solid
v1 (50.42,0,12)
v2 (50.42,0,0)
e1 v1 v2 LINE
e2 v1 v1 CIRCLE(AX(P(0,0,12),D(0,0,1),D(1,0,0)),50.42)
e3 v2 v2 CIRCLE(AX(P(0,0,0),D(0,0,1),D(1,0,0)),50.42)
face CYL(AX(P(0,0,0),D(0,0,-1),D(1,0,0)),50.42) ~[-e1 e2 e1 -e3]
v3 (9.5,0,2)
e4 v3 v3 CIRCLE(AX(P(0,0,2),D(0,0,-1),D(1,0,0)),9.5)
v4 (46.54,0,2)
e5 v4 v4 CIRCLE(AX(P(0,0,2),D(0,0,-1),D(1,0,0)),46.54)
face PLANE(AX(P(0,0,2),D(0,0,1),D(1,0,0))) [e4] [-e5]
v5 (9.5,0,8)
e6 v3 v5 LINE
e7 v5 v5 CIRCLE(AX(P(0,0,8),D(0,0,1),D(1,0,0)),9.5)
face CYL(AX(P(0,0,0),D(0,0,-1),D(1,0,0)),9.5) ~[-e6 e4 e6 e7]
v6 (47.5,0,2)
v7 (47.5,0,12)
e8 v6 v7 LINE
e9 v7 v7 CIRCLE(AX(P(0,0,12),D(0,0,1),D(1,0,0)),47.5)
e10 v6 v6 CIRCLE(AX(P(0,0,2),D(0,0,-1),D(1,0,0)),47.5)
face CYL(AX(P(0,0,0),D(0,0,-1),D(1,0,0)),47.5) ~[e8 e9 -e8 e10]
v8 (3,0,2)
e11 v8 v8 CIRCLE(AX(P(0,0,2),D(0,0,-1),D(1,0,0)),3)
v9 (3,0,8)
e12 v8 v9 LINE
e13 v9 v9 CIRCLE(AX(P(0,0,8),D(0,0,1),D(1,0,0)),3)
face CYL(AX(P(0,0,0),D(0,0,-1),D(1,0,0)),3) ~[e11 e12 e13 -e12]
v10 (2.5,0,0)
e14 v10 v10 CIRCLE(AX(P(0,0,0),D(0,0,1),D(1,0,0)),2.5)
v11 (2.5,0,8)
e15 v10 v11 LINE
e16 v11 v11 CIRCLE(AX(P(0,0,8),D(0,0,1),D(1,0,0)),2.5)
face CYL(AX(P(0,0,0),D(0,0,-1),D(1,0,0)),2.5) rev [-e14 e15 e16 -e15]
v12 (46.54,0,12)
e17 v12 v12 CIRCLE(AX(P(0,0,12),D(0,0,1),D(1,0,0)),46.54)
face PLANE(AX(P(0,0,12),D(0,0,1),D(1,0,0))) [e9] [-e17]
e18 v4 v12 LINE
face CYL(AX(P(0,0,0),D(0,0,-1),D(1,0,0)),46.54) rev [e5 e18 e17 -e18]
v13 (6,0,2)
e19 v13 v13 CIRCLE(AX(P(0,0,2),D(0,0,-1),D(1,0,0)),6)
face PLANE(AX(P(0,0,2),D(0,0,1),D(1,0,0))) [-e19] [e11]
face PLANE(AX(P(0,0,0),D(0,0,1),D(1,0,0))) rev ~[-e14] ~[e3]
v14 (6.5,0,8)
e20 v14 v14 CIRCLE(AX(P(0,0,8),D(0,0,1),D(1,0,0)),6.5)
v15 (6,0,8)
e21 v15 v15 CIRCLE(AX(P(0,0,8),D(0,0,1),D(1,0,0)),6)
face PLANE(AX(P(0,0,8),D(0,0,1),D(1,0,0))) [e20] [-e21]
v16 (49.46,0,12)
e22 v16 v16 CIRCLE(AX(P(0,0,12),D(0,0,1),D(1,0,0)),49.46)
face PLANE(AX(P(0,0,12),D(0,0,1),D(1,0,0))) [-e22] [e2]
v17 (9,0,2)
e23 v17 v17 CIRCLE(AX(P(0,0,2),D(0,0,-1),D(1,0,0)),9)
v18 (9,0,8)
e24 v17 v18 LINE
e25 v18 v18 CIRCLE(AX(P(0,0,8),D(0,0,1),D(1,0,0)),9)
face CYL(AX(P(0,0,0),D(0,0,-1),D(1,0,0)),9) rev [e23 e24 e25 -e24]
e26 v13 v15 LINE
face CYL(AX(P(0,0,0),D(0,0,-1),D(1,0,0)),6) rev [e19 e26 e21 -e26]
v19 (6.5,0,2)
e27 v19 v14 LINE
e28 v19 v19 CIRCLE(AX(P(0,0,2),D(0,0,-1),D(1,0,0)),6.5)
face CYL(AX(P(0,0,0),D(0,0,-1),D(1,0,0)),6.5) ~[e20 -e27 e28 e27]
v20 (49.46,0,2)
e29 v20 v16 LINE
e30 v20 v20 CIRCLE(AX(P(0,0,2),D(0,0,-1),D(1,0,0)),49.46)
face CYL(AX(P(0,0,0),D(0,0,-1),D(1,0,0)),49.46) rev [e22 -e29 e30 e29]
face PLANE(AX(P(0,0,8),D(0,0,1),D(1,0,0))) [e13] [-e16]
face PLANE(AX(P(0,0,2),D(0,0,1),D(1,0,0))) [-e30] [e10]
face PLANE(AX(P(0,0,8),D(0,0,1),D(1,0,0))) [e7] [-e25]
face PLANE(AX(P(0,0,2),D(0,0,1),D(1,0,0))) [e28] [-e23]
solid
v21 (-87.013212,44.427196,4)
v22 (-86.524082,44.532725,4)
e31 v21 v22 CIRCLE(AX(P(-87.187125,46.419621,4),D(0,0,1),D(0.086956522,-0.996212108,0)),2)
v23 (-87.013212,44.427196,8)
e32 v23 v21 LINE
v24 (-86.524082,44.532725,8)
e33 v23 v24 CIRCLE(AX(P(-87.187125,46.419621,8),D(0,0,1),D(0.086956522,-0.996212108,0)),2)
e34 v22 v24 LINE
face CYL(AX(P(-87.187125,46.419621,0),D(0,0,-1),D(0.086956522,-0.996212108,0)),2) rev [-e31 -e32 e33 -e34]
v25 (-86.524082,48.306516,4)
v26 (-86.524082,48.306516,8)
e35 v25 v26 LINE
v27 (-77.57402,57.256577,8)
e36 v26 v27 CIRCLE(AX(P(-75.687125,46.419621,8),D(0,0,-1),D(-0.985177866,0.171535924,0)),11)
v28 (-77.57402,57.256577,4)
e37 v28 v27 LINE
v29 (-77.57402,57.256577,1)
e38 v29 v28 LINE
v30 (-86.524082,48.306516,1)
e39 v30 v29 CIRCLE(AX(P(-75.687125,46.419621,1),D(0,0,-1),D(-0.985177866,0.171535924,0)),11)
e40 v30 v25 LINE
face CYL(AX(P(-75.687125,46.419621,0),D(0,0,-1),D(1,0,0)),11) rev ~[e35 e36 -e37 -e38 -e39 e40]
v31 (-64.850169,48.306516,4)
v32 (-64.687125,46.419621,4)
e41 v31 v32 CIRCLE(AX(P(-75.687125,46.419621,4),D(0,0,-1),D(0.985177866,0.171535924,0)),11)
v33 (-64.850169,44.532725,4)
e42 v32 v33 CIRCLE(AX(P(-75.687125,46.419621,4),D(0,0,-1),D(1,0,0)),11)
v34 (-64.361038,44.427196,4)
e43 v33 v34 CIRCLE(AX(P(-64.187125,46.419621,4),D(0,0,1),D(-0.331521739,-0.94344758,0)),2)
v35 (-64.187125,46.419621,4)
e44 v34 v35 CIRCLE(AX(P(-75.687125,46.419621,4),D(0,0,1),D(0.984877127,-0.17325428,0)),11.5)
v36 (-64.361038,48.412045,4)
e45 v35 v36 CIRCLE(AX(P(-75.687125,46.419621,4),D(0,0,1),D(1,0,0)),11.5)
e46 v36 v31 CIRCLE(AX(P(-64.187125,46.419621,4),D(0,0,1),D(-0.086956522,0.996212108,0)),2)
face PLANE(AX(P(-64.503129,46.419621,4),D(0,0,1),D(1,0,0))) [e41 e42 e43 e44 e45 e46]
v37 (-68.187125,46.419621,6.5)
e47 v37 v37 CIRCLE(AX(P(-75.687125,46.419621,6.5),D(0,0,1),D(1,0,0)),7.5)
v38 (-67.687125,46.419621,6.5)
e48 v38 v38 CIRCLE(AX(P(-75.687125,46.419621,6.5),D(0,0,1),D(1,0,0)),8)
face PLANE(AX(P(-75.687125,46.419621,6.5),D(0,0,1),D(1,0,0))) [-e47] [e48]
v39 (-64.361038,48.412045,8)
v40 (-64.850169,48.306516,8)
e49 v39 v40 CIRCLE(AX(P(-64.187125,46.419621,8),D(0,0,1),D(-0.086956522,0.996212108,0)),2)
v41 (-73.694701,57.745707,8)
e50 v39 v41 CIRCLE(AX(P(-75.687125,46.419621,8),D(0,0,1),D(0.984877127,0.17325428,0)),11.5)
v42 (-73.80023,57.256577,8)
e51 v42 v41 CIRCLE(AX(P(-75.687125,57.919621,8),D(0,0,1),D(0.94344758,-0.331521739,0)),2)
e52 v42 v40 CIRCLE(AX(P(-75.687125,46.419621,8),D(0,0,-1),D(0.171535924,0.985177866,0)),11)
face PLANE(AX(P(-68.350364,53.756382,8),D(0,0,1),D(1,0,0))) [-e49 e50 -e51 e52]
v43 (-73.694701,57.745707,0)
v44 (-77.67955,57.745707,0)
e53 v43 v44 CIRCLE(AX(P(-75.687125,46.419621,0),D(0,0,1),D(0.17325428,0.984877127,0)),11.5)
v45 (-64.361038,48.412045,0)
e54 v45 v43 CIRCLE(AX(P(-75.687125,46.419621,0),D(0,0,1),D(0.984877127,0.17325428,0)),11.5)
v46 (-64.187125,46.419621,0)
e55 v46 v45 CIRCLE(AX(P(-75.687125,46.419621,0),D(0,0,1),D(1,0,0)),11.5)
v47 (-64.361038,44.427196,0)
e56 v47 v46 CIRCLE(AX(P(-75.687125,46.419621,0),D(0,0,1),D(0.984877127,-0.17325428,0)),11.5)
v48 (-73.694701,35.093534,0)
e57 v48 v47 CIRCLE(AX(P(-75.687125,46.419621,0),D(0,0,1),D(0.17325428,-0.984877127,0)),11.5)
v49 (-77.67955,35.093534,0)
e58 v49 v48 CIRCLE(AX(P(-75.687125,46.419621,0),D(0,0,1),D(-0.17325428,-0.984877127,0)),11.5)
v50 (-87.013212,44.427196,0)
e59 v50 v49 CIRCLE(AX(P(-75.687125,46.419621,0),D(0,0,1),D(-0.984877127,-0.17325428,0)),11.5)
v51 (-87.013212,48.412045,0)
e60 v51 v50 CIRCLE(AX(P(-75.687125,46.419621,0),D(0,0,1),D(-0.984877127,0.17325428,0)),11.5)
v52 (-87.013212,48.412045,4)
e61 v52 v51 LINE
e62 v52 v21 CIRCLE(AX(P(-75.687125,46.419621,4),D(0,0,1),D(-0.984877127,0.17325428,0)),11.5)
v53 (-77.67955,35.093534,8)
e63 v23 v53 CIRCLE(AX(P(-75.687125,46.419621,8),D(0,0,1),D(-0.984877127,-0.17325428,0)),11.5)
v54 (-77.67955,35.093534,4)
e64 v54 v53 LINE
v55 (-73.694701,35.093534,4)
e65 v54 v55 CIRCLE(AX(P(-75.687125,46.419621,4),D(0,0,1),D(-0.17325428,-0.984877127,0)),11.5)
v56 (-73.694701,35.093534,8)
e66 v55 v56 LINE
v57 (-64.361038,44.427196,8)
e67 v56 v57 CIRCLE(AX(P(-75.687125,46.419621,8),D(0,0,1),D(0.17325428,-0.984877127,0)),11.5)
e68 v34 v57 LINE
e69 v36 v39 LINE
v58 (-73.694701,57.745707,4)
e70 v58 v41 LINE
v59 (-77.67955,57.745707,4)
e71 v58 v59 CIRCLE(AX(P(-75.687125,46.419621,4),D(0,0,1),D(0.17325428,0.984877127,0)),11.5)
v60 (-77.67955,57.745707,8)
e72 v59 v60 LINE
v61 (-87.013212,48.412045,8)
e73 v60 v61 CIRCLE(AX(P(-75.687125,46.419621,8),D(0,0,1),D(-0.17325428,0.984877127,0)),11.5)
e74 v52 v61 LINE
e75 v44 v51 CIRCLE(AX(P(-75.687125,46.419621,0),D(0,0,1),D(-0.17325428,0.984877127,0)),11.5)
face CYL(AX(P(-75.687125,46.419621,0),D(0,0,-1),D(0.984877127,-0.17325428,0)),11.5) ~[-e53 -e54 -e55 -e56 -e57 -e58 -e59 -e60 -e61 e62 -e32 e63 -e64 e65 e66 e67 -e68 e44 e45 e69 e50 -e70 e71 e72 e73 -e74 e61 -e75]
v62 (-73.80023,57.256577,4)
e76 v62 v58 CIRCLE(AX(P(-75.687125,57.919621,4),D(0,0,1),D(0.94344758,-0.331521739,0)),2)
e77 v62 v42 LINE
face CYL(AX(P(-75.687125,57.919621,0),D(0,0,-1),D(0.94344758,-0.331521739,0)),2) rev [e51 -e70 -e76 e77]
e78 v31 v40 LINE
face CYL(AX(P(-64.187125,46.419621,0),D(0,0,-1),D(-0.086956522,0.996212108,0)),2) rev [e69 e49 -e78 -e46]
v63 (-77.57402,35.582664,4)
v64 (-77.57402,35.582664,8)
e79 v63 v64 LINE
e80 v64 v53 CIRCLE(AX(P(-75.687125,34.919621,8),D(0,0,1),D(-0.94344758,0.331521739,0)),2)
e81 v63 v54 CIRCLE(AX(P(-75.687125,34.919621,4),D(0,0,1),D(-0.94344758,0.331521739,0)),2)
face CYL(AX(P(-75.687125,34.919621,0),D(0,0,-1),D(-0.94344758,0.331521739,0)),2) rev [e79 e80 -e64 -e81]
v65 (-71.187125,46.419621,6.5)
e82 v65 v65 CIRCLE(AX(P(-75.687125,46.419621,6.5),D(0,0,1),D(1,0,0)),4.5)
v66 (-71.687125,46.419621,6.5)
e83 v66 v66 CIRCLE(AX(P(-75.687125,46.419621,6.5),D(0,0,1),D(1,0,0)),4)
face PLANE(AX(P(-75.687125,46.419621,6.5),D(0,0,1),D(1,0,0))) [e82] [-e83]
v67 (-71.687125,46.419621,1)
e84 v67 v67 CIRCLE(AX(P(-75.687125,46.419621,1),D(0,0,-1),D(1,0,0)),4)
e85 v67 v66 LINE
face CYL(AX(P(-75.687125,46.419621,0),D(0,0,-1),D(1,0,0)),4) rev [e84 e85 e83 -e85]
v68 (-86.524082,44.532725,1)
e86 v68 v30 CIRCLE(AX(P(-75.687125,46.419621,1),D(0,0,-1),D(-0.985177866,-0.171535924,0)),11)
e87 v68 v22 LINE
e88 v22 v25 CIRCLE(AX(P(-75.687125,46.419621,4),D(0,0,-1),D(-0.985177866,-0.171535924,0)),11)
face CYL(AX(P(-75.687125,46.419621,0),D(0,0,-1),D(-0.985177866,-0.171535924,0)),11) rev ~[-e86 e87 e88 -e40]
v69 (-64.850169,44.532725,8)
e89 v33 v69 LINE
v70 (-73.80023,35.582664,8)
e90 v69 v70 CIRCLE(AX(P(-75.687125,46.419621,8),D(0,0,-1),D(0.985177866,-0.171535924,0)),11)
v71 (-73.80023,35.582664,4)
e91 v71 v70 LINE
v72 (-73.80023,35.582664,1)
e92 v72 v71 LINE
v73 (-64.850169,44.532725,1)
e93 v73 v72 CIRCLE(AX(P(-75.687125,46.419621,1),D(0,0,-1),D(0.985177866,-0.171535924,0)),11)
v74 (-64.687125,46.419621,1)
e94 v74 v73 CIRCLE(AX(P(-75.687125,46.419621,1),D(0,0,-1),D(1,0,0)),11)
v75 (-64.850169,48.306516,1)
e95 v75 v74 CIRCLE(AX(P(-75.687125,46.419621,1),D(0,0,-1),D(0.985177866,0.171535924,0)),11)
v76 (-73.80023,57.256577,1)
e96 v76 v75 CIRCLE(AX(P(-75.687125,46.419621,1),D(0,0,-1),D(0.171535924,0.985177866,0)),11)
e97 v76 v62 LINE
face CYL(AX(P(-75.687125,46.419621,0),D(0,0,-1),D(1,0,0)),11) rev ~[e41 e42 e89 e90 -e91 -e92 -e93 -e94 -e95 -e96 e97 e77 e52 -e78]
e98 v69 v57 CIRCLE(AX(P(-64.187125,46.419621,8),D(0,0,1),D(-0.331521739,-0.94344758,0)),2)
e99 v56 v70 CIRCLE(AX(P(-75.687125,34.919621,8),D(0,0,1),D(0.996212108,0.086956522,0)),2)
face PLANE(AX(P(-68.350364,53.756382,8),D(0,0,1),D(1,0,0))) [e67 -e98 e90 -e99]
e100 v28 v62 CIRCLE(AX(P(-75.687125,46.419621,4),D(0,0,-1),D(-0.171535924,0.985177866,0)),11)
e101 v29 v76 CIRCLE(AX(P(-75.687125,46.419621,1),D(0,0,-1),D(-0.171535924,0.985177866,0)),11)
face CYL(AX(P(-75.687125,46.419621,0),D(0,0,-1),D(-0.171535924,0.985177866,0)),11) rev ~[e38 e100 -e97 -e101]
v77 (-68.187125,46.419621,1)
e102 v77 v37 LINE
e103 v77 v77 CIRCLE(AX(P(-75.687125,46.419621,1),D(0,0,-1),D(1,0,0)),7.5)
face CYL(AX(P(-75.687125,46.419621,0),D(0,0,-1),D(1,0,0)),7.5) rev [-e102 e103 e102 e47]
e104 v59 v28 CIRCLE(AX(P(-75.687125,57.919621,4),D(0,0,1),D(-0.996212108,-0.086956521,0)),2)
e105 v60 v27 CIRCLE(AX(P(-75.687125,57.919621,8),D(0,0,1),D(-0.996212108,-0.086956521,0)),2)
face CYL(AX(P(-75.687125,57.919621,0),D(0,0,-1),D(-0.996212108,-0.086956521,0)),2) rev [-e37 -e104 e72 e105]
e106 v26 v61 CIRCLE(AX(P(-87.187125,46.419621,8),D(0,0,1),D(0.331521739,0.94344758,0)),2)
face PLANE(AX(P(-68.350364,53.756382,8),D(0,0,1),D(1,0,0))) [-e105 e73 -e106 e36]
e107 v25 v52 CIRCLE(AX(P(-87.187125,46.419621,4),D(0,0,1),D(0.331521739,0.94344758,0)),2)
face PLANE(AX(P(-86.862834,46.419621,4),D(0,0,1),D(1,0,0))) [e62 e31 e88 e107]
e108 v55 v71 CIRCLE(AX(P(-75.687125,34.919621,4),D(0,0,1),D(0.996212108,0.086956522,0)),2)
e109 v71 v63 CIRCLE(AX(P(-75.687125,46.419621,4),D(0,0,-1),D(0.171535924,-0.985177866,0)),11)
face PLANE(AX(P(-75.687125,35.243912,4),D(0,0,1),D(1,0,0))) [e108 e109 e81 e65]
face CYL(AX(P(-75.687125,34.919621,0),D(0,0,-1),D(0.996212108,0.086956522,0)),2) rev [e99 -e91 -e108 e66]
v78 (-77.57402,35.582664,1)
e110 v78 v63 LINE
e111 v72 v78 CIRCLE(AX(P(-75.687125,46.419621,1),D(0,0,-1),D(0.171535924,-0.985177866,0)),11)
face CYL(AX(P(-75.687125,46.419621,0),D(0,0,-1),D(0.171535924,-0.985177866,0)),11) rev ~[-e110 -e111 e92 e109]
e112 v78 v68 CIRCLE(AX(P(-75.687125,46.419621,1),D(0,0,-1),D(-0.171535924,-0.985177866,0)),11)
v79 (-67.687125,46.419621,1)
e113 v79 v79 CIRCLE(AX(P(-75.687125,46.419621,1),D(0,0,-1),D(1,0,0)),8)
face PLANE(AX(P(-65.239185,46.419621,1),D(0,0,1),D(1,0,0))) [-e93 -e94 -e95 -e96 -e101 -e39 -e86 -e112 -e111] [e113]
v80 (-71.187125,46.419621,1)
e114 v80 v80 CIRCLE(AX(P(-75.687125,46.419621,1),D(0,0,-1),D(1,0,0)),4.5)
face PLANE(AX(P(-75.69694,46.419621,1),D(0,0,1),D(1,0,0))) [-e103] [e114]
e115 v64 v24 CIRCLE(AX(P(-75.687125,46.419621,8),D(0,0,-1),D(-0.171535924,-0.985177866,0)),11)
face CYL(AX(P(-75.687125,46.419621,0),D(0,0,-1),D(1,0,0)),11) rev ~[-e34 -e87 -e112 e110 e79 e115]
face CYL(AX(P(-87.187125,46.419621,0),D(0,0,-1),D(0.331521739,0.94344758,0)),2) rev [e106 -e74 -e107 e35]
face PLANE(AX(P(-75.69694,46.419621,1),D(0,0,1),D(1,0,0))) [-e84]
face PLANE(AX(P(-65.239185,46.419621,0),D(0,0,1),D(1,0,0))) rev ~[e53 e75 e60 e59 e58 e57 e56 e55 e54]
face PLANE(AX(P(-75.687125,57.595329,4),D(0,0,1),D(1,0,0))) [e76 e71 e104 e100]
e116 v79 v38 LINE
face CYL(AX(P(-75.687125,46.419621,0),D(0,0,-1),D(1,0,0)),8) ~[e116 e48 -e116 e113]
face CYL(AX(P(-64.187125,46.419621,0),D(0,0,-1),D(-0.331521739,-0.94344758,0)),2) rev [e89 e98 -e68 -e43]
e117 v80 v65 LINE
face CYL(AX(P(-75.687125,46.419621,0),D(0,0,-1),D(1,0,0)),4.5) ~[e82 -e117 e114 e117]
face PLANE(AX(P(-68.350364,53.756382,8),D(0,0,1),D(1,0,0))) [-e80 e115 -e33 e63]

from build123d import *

# Parameters (mm, degrees)
F0_R      = 50.42
F0_R_2    = 49.46
F0_R_3    = 47.5
F0_R_4    = 46.54
F0_R_5    = 9.5
F0_R_6    = 9
F0_R_7    = 6.5
F0_R_8    = 6
F0_R_9    = 3
F0_R_10   = 2.5
F1_DEPTH  = 2
F2_DEPTH  = 12
F3_DEPTH  = 8
F4_R      = 8
F4_R_2    = 7.5
F4_R_3    = 4.5
F4_R_4    = 4
F5_DEPTH  = 1
F6_DEPTH  = 8
F7_DEPTH  = 8
F8_DEPTH  = 1.5
F9_DEPTH  = 1
F10_DEPTH = 4


with BuildPart() as f1:
    # F0 (on Top) → F1 (new body)
    with BuildSketch(Plane.XY):
        Circle(F0_R)
        Circle(F0_R_2, mode=Mode.SUBTRACT)
        Circle(F0_R_2)
        Circle(F0_R_3, mode=Mode.SUBTRACT)
        Circle(F0_R_3)
        Circle(F0_R_4, mode=Mode.SUBTRACT)
        Circle(F0_R_4)
        Circle(F0_R_5, mode=Mode.SUBTRACT)
        Circle(F0_R_5)
        Circle(F0_R_6, mode=Mode.SUBTRACT)
        Circle(F0_R_6)
        Circle(F0_R_7, mode=Mode.SUBTRACT)
        Circle(F0_R_7)
        Circle(F0_R_8, mode=Mode.SUBTRACT)
        Circle(F0_R_8)
        Circle(F0_R_9, mode=Mode.SUBTRACT)
        Circle(F0_R_9)
        Circle(F0_R_10, mode=Mode.SUBTRACT)
    extrude(amount=F1_DEPTH)

    # F0 (on Top) → F2 (join)
    with BuildSketch(Plane.XY):
        Circle(F0_R)
        Circle(F0_R_2, mode=Mode.SUBTRACT)
        Circle(F0_R_3)
        Circle(F0_R_4, mode=Mode.SUBTRACT)
    extrude(amount=F2_DEPTH)

    # F0 (on Top) → F3 (join)
    with BuildSketch(Plane.XY):
        Circle(F0_R_5)
        Circle(F0_R_6, mode=Mode.SUBTRACT)
        Circle(F0_R_7)
        Circle(F0_R_8, mode=Mode.SUBTRACT)
        Circle(F0_R_9)
        Circle(F0_R_10, mode=Mode.SUBTRACT)
    extrude(amount=F3_DEPTH)


with BuildPart() as f5:
    # F4 (on Top) → F5 (new body)
    with BuildSketch(Plane.XY):
        with BuildLine():
            ThreePointArc((-64.8501688035, 44.5327253536), (-66.1871253252, 46.4196205139), (-64.8501688035, 48.3065156742))
            ThreePointArc((-64.8501688035, 48.3065156742), (-67.9089507322, 54.197795107), (-73.8002301649, 57.2565770357))
            ThreePointArc((-73.8002301649, 57.2565770357), (-75.6871253252, 55.9196205139), (-77.5740204855, 57.2565770357))
            ThreePointArc((-77.5740204855, 57.2565770357), (-83.4652999183, 54.197795107), (-86.5240818469, 48.3065156742))
            ThreePointArc((-86.5240818469, 48.3065156742), (-85.5552419108, 47.5758888745), (-85.1871253252, 46.4196205139))
            ThreePointArc((-85.1871253252, 46.4196205139), (-85.5552419108, 45.2633521533), (-86.5240818469, 44.5327253536))
            ThreePointArc((-86.5240818469, 44.5327253536), (-83.4652999183, 38.6414459209), (-77.5740204855, 35.5826639922))
            ThreePointArc((-77.5740204855, 35.5826639922), (-75.6871253252, 36.9196205139), (-73.8002301649, 35.5826639922))
            ThreePointArc((-73.8002301649, 35.5826639922), (-67.9089507322, 38.6414459209), (-64.8501688035, 44.5327253536))
        make_face()
        with Locations((-75.6871253252, 46.4196205139)):
            Circle(F4_R, mode=Mode.SUBTRACT)
        with Locations((-75.6871253252, 46.4196205139)):
            Circle(F4_R)
        with Locations((-75.6871253252, 46.4196205139)):
            Circle(F4_R_2, mode=Mode.SUBTRACT)
        with Locations((-75.6871253252, 46.4196205139)):
            Circle(F4_R_2)
        with Locations((-75.6871253252, 46.4196205139)):
            Circle(F4_R_3, mode=Mode.SUBTRACT)
        with Locations((-75.6871253252, 46.4196205139)):
            Circle(F4_R_3)
        with Locations((-75.6871253252, 46.4196205139)):
            Circle(F4_R_4, mode=Mode.SUBTRACT)
        with Locations((-75.6871253252, 46.4196205139)):
            Circle(F4_R_4)
        with BuildLine():
            ThreePointArc((-73.8002301649, 57.2565770357), (-67.9089507322, 54.197795107), (-64.8501688035, 48.3065156742))
            ThreePointArc((-64.8501688035, 48.3065156742), (-64.6089169209, 48.374637611), (-64.3610383687, 48.4120447291))
            ThreePointArc((-64.3610383687, 48.4120447291), (-67.5553973416, 54.5513484976), (-73.69470111, 57.7457074704))
            ThreePointArc((-73.69470111, 57.7457074704), (-73.7321082281, 57.4978289182), (-73.8002301649, 57.2565770357))
        make_face()
        with BuildLine():
            ThreePointArc((-86.5240818469, 48.3065156742), (-83.4652999183, 54.197795107), (-77.5740204855, 57.2565770357))
            ThreePointArc((-77.5740204855, 57.2565770357), (-77.6421424223, 57.4978289182), (-77.6795495404, 57.7457074704))
            ThreePointArc((-77.6795495404, 57.7457074704), (-83.8188533088, 54.5513484976), (-87.0132122817, 48.4120447291))
            ThreePointArc((-87.0132122817, 48.4120447291), (-86.7653337295, 48.374637611), (-86.5240818469, 48.3065156742))
        make_face()
        with BuildLine():
            ThreePointArc((-77.6795495404, 35.0935335574), (-77.6421424223, 35.3414121096), (-77.5740204855, 35.5826639922))
            ThreePointArc((-77.5740204855, 35.5826639922), (-83.4652999183, 38.6414459209), (-86.5240818469, 44.5327253536))
            ThreePointArc((-86.5240818469, 44.5327253536), (-86.7653337295, 44.4646034168), (-87.0132122817, 44.4271962987))
            ThreePointArc((-87.0132122817, 44.4271962987), (-83.8188533088, 38.2878925303), (-77.6795495404, 35.0935335574))
        make_face()
        with BuildLine():
            ThreePointArc((-64.3610383687, 44.4271962987), (-64.6089169209, 44.4646034168), (-64.8501688035, 44.5327253536))
            ThreePointArc((-64.8501688035, 44.5327253536), (-67.9089507322, 38.6414459209), (-73.8002301649, 35.5826639922))
            ThreePointArc((-73.8002301649, 35.5826639922), (-73.7321082281, 35.3414121096), (-73.69470111, 35.0935335574))
            ThreePointArc((-73.69470111, 35.0935335574), (-67.5553973416, 38.2878925303), (-64.3610383687, 44.4271962987))
        make_face()
        with BuildLine():
            ThreePointArc((-77.5740204855, 57.2565770357), (-75.6871253252, 57.4196205139), (-73.8002301649, 57.2565770357))
            ThreePointArc((-73.8002301649, 57.2565770357), (-73.7321082281, 57.4978289182), (-73.69470111, 57.7457074704))
            ThreePointArc((-73.69470111, 57.7457074704), (-75.6871253252, 57.9196205139), (-77.6795495404, 57.7457074704))
            ThreePointArc((-77.6795495404, 57.7457074704), (-77.6421424223, 57.4978289182), (-77.5740204855, 57.2565770357))
        make_face()
        with BuildLine():
            ThreePointArc((-86.5240818469, 44.5327253536), (-86.6871253252, 46.4196205139), (-86.5240818469, 48.3065156742))
            ThreePointArc((-86.5240818469, 48.3065156742), (-86.7653337295, 48.374637611), (-87.0132122817, 48.4120447291))
            ThreePointArc((-87.0132122817, 48.4120447291), (-87.1871253252, 46.4196205139), (-87.0132122817, 44.4271962987))
            ThreePointArc((-87.0132122817, 44.4271962987), (-86.7653337295, 44.4646034168), (-86.5240818469, 44.5327253536))
        make_face()
        with BuildLine():
            ThreePointArc((-73.69470111, 35.0935335574), (-73.7321082281, 35.3414121096), (-73.8002301649, 35.5826639922))
            ThreePointArc((-73.8002301649, 35.5826639922), (-75.6871253252, 35.4196205139), (-77.5740204855, 35.5826639922))
            ThreePointArc((-77.5740204855, 35.5826639922), (-77.6421424223, 35.3414121096), (-77.6795495404, 35.0935335574))
            ThreePointArc((-77.6795495404, 35.0935335574), (-75.6871253252, 34.9196205139), (-73.69470111, 35.0935335574))
        make_face()
        with BuildLine():
            ThreePointArc((-64.8501688035, 48.3065156742), (-64.7279619963, 47.3665836232), (-64.6871253252, 46.4196205139))
            ThreePointArc((-64.6871253252, 46.4196205139), (-64.7279619963, 45.4726574046), (-64.8501688035, 44.5327253536))
            ThreePointArc((-64.8501688035, 44.5327253536), (-64.6089169209, 44.4646034168), (-64.3610383687, 44.4271962987))
            ThreePointArc((-64.3610383687, 44.4271962987), (-64.2306860878, 45.4196205139), (-64.1871253252, 46.4196205139))
            ThreePointArc((-64.1871253252, 46.4196205139), (-64.2306860878, 47.4196205139), (-64.3610383687, 48.4120447291))
            ThreePointArc((-64.3610383687, 48.4120447291), (-64.6089169209, 48.374637611), (-64.8501688035, 48.3065156742))
        make_face()
    extrude(amount=F5_DEPTH)

    # F4 (on Top) → F6 (join)
    with BuildSketch(Plane.XY):
        with BuildLine():
            ThreePointArc((-73.8002301649, 57.2565770357), (-67.9089507322, 54.197795107), (-64.8501688035, 48.3065156742))
            ThreePointArc((-64.8501688035, 48.3065156742), (-64.6089169209, 48.374637611), (-64.3610383687, 48.4120447291))
            ThreePointArc((-64.3610383687, 48.4120447291), (-67.5553973416, 54.5513484976), (-73.69470111, 57.7457074704))
            ThreePointArc((-73.69470111, 57.7457074704), (-73.7321082281, 57.4978289182), (-73.8002301649, 57.2565770357))
        make_face()
        with BuildLine():
            ThreePointArc((-77.5740204855, 57.2565770357), (-75.6871253252, 57.4196205139), (-73.8002301649, 57.2565770357))
            ThreePointArc((-73.8002301649, 57.2565770357), (-73.7321082281, 57.4978289182), (-73.69470111, 57.7457074704))
            ThreePointArc((-73.69470111, 57.7457074704), (-75.6871253252, 57.9196205139), (-77.6795495404, 57.7457074704))
            ThreePointArc((-77.6795495404, 57.7457074704), (-77.6421424223, 57.4978289182), (-77.5740204855, 57.2565770357))
        make_face()
        with BuildLine():
            ThreePointArc((-86.5240818469, 48.3065156742), (-83.4652999183, 54.197795107), (-77.5740204855, 57.2565770357))
            ThreePointArc((-77.5740204855, 57.2565770357), (-77.6421424223, 57.4978289182), (-77.6795495404, 57.7457074704))
            ThreePointArc((-77.6795495404, 57.7457074704), (-83.8188533088, 54.5513484976), (-87.0132122817, 48.4120447291))
            ThreePointArc((-87.0132122817, 48.4120447291), (-86.7653337295, 48.374637611), (-86.5240818469, 48.3065156742))
        make_face()
        with BuildLine():
            ThreePointArc((-86.5240818469, 44.5327253536), (-86.6871253252, 46.4196205139), (-86.5240818469, 48.3065156742))
            ThreePointArc((-86.5240818469, 48.3065156742), (-86.7653337295, 48.374637611), (-87.0132122817, 48.4120447291))
            ThreePointArc((-87.0132122817, 48.4120447291), (-87.1871253252, 46.4196205139), (-87.0132122817, 44.4271962987))
            ThreePointArc((-87.0132122817, 44.4271962987), (-86.7653337295, 44.4646034168), (-86.5240818469, 44.5327253536))
        make_face()
        with BuildLine():
            ThreePointArc((-77.6795495404, 35.0935335574), (-77.6421424223, 35.3414121096), (-77.5740204855, 35.5826639922))
            ThreePointArc((-77.5740204855, 35.5826639922), (-83.4652999183, 38.6414459209), (-86.5240818469, 44.5327253536))
            ThreePointArc((-86.5240818469, 44.5327253536), (-86.7653337295, 44.4646034168), (-87.0132122817, 44.4271962987))
            ThreePointArc((-87.0132122817, 44.4271962987), (-83.8188533088, 38.2878925303), (-77.6795495404, 35.0935335574))
        make_face()
        with BuildLine():
            ThreePointArc((-73.69470111, 35.0935335574), (-73.7321082281, 35.3414121096), (-73.8002301649, 35.5826639922))
            ThreePointArc((-73.8002301649, 35.5826639922), (-75.6871253252, 35.4196205139), (-77.5740204855, 35.5826639922))
            ThreePointArc((-77.5740204855, 35.5826639922), (-77.6421424223, 35.3414121096), (-77.6795495404, 35.0935335574))
            ThreePointArc((-77.6795495404, 35.0935335574), (-75.6871253252, 34.9196205139), (-73.69470111, 35.0935335574))
        make_face()
        with BuildLine():
            ThreePointArc((-64.3610383687, 44.4271962987), (-64.6089169209, 44.4646034168), (-64.8501688035, 44.5327253536))
            ThreePointArc((-64.8501688035, 44.5327253536), (-67.9089507322, 38.6414459209), (-73.8002301649, 35.5826639922))
            ThreePointArc((-73.8002301649, 35.5826639922), (-73.7321082281, 35.3414121096), (-73.69470111, 35.0935335574))
            ThreePointArc((-73.69470111, 35.0935335574), (-67.5553973416, 38.2878925303), (-64.3610383687, 44.4271962987))
        make_face()
        with BuildLine():
            ThreePointArc((-64.8501688035, 48.3065156742), (-64.7279619963, 47.3665836232), (-64.6871253252, 46.4196205139))
            ThreePointArc((-64.6871253252, 46.4196205139), (-64.7279619963, 45.4726574046), (-64.8501688035, 44.5327253536))
            ThreePointArc((-64.8501688035, 44.5327253536), (-64.6089169209, 44.4646034168), (-64.3610383687, 44.4271962987))
            ThreePointArc((-64.3610383687, 44.4271962987), (-64.2306860878, 45.4196205139), (-64.1871253252, 46.4196205139))
            ThreePointArc((-64.1871253252, 46.4196205139), (-64.2306860878, 47.4196205139), (-64.3610383687, 48.4120447291))
            ThreePointArc((-64.3610383687, 48.4120447291), (-64.6089169209, 48.374637611), (-64.8501688035, 48.3065156742))
        make_face()
        with Locations((-75.6871253252, 46.4196205139)):
            Circle(F4_R)
        with Locations((-75.6871253252, 46.4196205139)):
            Circle(F4_R_2, mode=Mode.SUBTRACT)
        with Locations((-75.6871253252, 46.4196205139)):
            Circle(F4_R_3)
        with Locations((-75.6871253252, 46.4196205139)):
            Circle(F4_R_4, mode=Mode.SUBTRACT)
    extrude(amount=F6_DEPTH)

    # F4 (on Top) → F7 (cut)
    with BuildSketch(Plane.XY):
        with BuildLine():
            ThreePointArc((-64.8501688035, 48.3065156742), (-64.7279619963, 47.3665836232), (-64.6871253252, 46.4196205139))
            ThreePointArc((-64.6871253252, 46.4196205139), (-64.7279619963, 45.4726574046), (-64.8501688035, 44.5327253536))
            ThreePointArc((-64.8501688035, 44.5327253536), (-64.6089169209, 44.4646034168), (-64.3610383687, 44.4271962987))
            ThreePointArc((-64.3610383687, 44.4271962987), (-64.2306860878, 45.4196205139), (-64.1871253252, 46.4196205139))
            ThreePointArc((-64.1871253252, 46.4196205139), (-64.2306860878, 47.4196205139), (-64.3610383687, 48.4120447291))
            ThreePointArc((-64.3610383687, 48.4120447291), (-64.6089169209, 48.374637611), (-64.8501688035, 48.3065156742))
        make_face()
        with BuildLine():
            ThreePointArc((-77.5740204855, 57.2565770357), (-75.6871253252, 57.4196205139), (-73.8002301649, 57.2565770357))
            ThreePointArc((-73.8002301649, 57.2565770357), (-73.7321082281, 57.4978289182), (-73.69470111, 57.7457074704))
            ThreePointArc((-73.69470111, 57.7457074704), (-75.6871253252, 57.9196205139), (-77.6795495404, 57.7457074704))
            ThreePointArc((-77.6795495404, 57.7457074704), (-77.6421424223, 57.4978289182), (-77.5740204855, 57.2565770357))
        make_face()
        with BuildLine():
            ThreePointArc((-73.69470111, 35.0935335574), (-73.7321082281, 35.3414121096), (-73.8002301649, 35.5826639922))
            ThreePointArc((-73.8002301649, 35.5826639922), (-75.6871253252, 35.4196205139), (-77.5740204855, 35.5826639922))
            ThreePointArc((-77.5740204855, 35.5826639922), (-77.6421424223, 35.3414121096), (-77.6795495404, 35.0935335574))
            ThreePointArc((-77.6795495404, 35.0935335574), (-75.6871253252, 34.9196205139), (-73.69470111, 35.0935335574))
        make_face()
        with BuildLine():
            ThreePointArc((-86.5240818469, 44.5327253536), (-86.6871253252, 46.4196205139), (-86.5240818469, 48.3065156742))
            ThreePointArc((-86.5240818469, 48.3065156742), (-86.7653337295, 48.374637611), (-87.0132122817, 48.4120447291))
            ThreePointArc((-87.0132122817, 48.4120447291), (-87.1871253252, 46.4196205139), (-87.0132122817, 44.4271962987))
            ThreePointArc((-87.0132122817, 44.4271962987), (-86.7653337295, 44.4646034168), (-86.5240818469, 44.5327253536))
        make_face()
    extrude(amount=F7_DEPTH, mode=Mode.SUBTRACT)

    # F8 (cut): faces of the model
    f8_faces = [f5.faces().sort_by_distance(p)[0] for p in [
        (-83.4608511552, 46.4196205139, 8),
        (-80.0598461046, 46.4196205139, 8),
    ]]
    extrude(f8_faces, amount=-F8_DEPTH, mode=Mode.SUBTRACT)

    # F4 (on Top) → F9 (join)
    with BuildSketch(Plane.XY):
        with BuildLine():
            ThreePointArc((-64.8501688035, 44.5327253536), (-64.7279619963, 45.4726574046), (-64.6871253252, 46.4196205139))
            ThreePointArc((-64.6871253252, 46.4196205139), (-64.7279619963, 47.3665836232), (-64.8501688035, 48.3065156742))
            ThreePointArc((-64.8501688035, 48.3065156742), (-66.1871253252, 46.4196205139), (-64.8501688035, 44.5327253536))
        make_face()
        with BuildLine():
            ThreePointArc((-64.8501688035, 48.3065156742), (-64.7279619963, 47.3665836232), (-64.6871253252, 46.4196205139))
            ThreePointArc((-64.6871253252, 46.4196205139), (-64.7279619963, 45.4726574046), (-64.8501688035, 44.5327253536))
            ThreePointArc((-64.8501688035, 44.5327253536), (-64.6089169209, 44.4646034168), (-64.3610383687, 44.4271962987))
            ThreePointArc((-64.3610383687, 44.4271962987), (-64.2306860878, 45.4196205139), (-64.1871253252, 46.4196205139))
            ThreePointArc((-64.1871253252, 46.4196205139), (-64.2306860878, 47.4196205139), (-64.3610383687, 48.4120447291))
            ThreePointArc((-64.3610383687, 48.4120447291), (-64.6089169209, 48.374637611), (-64.8501688035, 48.3065156742))
        make_face()
        with BuildLine():
            ThreePointArc((-77.5740204855, 57.2565770357), (-75.6871253252, 55.9196205139), (-73.8002301649, 57.2565770357))
            ThreePointArc((-73.8002301649, 57.2565770357), (-75.6871253252, 57.4196205139), (-77.5740204855, 57.2565770357))
        make_face()
        with BuildLine():
            ThreePointArc((-77.5740204855, 57.2565770357), (-75.6871253252, 57.4196205139), (-73.8002301649, 57.2565770357))
            ThreePointArc((-73.8002301649, 57.2565770357), (-73.7321082281, 57.4978289182), (-73.69470111, 57.7457074704))
            ThreePointArc((-73.69470111, 57.7457074704), (-75.6871253252, 57.9196205139), (-77.6795495404, 57.7457074704))
            ThreePointArc((-77.6795495404, 57.7457074704), (-77.6421424223, 57.4978289182), (-77.5740204855, 57.2565770357))
        make_face()
        with BuildLine():
            ThreePointArc((-73.69470111, 35.0935335574), (-73.7321082281, 35.3414121096), (-73.8002301649, 35.5826639922))
            ThreePointArc((-73.8002301649, 35.5826639922), (-75.6871253252, 35.4196205139), (-77.5740204855, 35.5826639922))
            ThreePointArc((-77.5740204855, 35.5826639922), (-77.6421424223, 35.3414121096), (-77.6795495404, 35.0935335574))
            ThreePointArc((-77.6795495404, 35.0935335574), (-75.6871253252, 34.9196205139), (-73.69470111, 35.0935335574))
        make_face()
        with BuildLine():
            ThreePointArc((-77.5740204855, 35.5826639922), (-75.6871253252, 35.4196205139), (-73.8002301649, 35.5826639922))
            ThreePointArc((-73.8002301649, 35.5826639922), (-75.6871253252, 36.9196205139), (-77.5740204855, 35.5826639922))
        make_face()
        with BuildLine():
            ThreePointArc((-85.1871253252, 46.4196205139), (-85.5552419108, 47.5758888745), (-86.5240818469, 48.3065156742))
            ThreePointArc((-86.5240818469, 48.3065156742), (-86.6871253252, 46.4196205139), (-86.5240818469, 44.5327253536))
            ThreePointArc((-86.5240818469, 44.5327253536), (-85.5552419108, 45.2633521533), (-85.1871253252, 46.4196205139))
        make_face()
        with BuildLine():
            ThreePointArc((-86.5240818469, 44.5327253536), (-86.6871253252, 46.4196205139), (-86.5240818469, 48.3065156742))
            ThreePointArc((-86.5240818469, 48.3065156742), (-86.7653337295, 48.374637611), (-87.0132122817, 48.4120447291))
            ThreePointArc((-87.0132122817, 48.4120447291), (-87.1871253252, 46.4196205139), (-87.0132122817, 44.4271962987))
            ThreePointArc((-87.0132122817, 44.4271962987), (-86.7653337295, 44.4646034168), (-86.5240818469, 44.5327253536))
        make_face()
    extrude(amount=F9_DEPTH)

    # F4 (on Top) → F10 (join)
    with BuildSketch(Plane.XY):
        with BuildLine():
            ThreePointArc((-64.8501688035, 48.3065156742), (-64.7279619963, 47.3665836232), (-64.6871253252, 46.4196205139))
            ThreePointArc((-64.6871253252, 46.4196205139), (-64.7279619963, 45.4726574046), (-64.8501688035, 44.5327253536))
            ThreePointArc((-64.8501688035, 44.5327253536), (-64.6089169209, 44.4646034168), (-64.3610383687, 44.4271962987))
            ThreePointArc((-64.3610383687, 44.4271962987), (-64.2306860878, 45.4196205139), (-64.1871253252, 46.4196205139))
            ThreePointArc((-64.1871253252, 46.4196205139), (-64.2306860878, 47.4196205139), (-64.3610383687, 48.4120447291))
            ThreePointArc((-64.3610383687, 48.4120447291), (-64.6089169209, 48.374637611), (-64.8501688035, 48.3065156742))
        make_face()
        with BuildLine():
            ThreePointArc((-77.5740204855, 57.2565770357), (-75.6871253252, 57.4196205139), (-73.8002301649, 57.2565770357))
            ThreePointArc((-73.8002301649, 57.2565770357), (-73.7321082281, 57.4978289182), (-73.69470111, 57.7457074704))
            ThreePointArc((-73.69470111, 57.7457074704), (-75.6871253252, 57.9196205139), (-77.6795495404, 57.7457074704))
            ThreePointArc((-77.6795495404, 57.7457074704), (-77.6421424223, 57.4978289182), (-77.5740204855, 57.2565770357))
        make_face()
        with BuildLine():
            ThreePointArc((-73.69470111, 35.0935335574), (-73.7321082281, 35.3414121096), (-73.8002301649, 35.5826639922))
            ThreePointArc((-73.8002301649, 35.5826639922), (-75.6871253252, 35.4196205139), (-77.5740204855, 35.5826639922))
            ThreePointArc((-77.5740204855, 35.5826639922), (-77.6421424223, 35.3414121096), (-77.6795495404, 35.0935335574))
            ThreePointArc((-77.6795495404, 35.0935335574), (-75.6871253252, 34.9196205139), (-73.69470111, 35.0935335574))
        make_face()
        with BuildLine():
            ThreePointArc((-86.5240818469, 44.5327253536), (-86.6871253252, 46.4196205139), (-86.5240818469, 48.3065156742))
            ThreePointArc((-86.5240818469, 48.3065156742), (-86.7653337295, 48.374637611), (-87.0132122817, 48.4120447291))
            ThreePointArc((-87.0132122817, 48.4120447291), (-87.1871253252, 46.4196205139), (-87.0132122817, 44.4271962987))
            ThreePointArc((-87.0132122817, 44.4271962987), (-86.7653337295, 44.4646034168), (-86.5240818469, 44.5327253536))
        make_face()
    extrude(amount=F10_DEPTH)


solid = Compound([f1.part, f5.part])
